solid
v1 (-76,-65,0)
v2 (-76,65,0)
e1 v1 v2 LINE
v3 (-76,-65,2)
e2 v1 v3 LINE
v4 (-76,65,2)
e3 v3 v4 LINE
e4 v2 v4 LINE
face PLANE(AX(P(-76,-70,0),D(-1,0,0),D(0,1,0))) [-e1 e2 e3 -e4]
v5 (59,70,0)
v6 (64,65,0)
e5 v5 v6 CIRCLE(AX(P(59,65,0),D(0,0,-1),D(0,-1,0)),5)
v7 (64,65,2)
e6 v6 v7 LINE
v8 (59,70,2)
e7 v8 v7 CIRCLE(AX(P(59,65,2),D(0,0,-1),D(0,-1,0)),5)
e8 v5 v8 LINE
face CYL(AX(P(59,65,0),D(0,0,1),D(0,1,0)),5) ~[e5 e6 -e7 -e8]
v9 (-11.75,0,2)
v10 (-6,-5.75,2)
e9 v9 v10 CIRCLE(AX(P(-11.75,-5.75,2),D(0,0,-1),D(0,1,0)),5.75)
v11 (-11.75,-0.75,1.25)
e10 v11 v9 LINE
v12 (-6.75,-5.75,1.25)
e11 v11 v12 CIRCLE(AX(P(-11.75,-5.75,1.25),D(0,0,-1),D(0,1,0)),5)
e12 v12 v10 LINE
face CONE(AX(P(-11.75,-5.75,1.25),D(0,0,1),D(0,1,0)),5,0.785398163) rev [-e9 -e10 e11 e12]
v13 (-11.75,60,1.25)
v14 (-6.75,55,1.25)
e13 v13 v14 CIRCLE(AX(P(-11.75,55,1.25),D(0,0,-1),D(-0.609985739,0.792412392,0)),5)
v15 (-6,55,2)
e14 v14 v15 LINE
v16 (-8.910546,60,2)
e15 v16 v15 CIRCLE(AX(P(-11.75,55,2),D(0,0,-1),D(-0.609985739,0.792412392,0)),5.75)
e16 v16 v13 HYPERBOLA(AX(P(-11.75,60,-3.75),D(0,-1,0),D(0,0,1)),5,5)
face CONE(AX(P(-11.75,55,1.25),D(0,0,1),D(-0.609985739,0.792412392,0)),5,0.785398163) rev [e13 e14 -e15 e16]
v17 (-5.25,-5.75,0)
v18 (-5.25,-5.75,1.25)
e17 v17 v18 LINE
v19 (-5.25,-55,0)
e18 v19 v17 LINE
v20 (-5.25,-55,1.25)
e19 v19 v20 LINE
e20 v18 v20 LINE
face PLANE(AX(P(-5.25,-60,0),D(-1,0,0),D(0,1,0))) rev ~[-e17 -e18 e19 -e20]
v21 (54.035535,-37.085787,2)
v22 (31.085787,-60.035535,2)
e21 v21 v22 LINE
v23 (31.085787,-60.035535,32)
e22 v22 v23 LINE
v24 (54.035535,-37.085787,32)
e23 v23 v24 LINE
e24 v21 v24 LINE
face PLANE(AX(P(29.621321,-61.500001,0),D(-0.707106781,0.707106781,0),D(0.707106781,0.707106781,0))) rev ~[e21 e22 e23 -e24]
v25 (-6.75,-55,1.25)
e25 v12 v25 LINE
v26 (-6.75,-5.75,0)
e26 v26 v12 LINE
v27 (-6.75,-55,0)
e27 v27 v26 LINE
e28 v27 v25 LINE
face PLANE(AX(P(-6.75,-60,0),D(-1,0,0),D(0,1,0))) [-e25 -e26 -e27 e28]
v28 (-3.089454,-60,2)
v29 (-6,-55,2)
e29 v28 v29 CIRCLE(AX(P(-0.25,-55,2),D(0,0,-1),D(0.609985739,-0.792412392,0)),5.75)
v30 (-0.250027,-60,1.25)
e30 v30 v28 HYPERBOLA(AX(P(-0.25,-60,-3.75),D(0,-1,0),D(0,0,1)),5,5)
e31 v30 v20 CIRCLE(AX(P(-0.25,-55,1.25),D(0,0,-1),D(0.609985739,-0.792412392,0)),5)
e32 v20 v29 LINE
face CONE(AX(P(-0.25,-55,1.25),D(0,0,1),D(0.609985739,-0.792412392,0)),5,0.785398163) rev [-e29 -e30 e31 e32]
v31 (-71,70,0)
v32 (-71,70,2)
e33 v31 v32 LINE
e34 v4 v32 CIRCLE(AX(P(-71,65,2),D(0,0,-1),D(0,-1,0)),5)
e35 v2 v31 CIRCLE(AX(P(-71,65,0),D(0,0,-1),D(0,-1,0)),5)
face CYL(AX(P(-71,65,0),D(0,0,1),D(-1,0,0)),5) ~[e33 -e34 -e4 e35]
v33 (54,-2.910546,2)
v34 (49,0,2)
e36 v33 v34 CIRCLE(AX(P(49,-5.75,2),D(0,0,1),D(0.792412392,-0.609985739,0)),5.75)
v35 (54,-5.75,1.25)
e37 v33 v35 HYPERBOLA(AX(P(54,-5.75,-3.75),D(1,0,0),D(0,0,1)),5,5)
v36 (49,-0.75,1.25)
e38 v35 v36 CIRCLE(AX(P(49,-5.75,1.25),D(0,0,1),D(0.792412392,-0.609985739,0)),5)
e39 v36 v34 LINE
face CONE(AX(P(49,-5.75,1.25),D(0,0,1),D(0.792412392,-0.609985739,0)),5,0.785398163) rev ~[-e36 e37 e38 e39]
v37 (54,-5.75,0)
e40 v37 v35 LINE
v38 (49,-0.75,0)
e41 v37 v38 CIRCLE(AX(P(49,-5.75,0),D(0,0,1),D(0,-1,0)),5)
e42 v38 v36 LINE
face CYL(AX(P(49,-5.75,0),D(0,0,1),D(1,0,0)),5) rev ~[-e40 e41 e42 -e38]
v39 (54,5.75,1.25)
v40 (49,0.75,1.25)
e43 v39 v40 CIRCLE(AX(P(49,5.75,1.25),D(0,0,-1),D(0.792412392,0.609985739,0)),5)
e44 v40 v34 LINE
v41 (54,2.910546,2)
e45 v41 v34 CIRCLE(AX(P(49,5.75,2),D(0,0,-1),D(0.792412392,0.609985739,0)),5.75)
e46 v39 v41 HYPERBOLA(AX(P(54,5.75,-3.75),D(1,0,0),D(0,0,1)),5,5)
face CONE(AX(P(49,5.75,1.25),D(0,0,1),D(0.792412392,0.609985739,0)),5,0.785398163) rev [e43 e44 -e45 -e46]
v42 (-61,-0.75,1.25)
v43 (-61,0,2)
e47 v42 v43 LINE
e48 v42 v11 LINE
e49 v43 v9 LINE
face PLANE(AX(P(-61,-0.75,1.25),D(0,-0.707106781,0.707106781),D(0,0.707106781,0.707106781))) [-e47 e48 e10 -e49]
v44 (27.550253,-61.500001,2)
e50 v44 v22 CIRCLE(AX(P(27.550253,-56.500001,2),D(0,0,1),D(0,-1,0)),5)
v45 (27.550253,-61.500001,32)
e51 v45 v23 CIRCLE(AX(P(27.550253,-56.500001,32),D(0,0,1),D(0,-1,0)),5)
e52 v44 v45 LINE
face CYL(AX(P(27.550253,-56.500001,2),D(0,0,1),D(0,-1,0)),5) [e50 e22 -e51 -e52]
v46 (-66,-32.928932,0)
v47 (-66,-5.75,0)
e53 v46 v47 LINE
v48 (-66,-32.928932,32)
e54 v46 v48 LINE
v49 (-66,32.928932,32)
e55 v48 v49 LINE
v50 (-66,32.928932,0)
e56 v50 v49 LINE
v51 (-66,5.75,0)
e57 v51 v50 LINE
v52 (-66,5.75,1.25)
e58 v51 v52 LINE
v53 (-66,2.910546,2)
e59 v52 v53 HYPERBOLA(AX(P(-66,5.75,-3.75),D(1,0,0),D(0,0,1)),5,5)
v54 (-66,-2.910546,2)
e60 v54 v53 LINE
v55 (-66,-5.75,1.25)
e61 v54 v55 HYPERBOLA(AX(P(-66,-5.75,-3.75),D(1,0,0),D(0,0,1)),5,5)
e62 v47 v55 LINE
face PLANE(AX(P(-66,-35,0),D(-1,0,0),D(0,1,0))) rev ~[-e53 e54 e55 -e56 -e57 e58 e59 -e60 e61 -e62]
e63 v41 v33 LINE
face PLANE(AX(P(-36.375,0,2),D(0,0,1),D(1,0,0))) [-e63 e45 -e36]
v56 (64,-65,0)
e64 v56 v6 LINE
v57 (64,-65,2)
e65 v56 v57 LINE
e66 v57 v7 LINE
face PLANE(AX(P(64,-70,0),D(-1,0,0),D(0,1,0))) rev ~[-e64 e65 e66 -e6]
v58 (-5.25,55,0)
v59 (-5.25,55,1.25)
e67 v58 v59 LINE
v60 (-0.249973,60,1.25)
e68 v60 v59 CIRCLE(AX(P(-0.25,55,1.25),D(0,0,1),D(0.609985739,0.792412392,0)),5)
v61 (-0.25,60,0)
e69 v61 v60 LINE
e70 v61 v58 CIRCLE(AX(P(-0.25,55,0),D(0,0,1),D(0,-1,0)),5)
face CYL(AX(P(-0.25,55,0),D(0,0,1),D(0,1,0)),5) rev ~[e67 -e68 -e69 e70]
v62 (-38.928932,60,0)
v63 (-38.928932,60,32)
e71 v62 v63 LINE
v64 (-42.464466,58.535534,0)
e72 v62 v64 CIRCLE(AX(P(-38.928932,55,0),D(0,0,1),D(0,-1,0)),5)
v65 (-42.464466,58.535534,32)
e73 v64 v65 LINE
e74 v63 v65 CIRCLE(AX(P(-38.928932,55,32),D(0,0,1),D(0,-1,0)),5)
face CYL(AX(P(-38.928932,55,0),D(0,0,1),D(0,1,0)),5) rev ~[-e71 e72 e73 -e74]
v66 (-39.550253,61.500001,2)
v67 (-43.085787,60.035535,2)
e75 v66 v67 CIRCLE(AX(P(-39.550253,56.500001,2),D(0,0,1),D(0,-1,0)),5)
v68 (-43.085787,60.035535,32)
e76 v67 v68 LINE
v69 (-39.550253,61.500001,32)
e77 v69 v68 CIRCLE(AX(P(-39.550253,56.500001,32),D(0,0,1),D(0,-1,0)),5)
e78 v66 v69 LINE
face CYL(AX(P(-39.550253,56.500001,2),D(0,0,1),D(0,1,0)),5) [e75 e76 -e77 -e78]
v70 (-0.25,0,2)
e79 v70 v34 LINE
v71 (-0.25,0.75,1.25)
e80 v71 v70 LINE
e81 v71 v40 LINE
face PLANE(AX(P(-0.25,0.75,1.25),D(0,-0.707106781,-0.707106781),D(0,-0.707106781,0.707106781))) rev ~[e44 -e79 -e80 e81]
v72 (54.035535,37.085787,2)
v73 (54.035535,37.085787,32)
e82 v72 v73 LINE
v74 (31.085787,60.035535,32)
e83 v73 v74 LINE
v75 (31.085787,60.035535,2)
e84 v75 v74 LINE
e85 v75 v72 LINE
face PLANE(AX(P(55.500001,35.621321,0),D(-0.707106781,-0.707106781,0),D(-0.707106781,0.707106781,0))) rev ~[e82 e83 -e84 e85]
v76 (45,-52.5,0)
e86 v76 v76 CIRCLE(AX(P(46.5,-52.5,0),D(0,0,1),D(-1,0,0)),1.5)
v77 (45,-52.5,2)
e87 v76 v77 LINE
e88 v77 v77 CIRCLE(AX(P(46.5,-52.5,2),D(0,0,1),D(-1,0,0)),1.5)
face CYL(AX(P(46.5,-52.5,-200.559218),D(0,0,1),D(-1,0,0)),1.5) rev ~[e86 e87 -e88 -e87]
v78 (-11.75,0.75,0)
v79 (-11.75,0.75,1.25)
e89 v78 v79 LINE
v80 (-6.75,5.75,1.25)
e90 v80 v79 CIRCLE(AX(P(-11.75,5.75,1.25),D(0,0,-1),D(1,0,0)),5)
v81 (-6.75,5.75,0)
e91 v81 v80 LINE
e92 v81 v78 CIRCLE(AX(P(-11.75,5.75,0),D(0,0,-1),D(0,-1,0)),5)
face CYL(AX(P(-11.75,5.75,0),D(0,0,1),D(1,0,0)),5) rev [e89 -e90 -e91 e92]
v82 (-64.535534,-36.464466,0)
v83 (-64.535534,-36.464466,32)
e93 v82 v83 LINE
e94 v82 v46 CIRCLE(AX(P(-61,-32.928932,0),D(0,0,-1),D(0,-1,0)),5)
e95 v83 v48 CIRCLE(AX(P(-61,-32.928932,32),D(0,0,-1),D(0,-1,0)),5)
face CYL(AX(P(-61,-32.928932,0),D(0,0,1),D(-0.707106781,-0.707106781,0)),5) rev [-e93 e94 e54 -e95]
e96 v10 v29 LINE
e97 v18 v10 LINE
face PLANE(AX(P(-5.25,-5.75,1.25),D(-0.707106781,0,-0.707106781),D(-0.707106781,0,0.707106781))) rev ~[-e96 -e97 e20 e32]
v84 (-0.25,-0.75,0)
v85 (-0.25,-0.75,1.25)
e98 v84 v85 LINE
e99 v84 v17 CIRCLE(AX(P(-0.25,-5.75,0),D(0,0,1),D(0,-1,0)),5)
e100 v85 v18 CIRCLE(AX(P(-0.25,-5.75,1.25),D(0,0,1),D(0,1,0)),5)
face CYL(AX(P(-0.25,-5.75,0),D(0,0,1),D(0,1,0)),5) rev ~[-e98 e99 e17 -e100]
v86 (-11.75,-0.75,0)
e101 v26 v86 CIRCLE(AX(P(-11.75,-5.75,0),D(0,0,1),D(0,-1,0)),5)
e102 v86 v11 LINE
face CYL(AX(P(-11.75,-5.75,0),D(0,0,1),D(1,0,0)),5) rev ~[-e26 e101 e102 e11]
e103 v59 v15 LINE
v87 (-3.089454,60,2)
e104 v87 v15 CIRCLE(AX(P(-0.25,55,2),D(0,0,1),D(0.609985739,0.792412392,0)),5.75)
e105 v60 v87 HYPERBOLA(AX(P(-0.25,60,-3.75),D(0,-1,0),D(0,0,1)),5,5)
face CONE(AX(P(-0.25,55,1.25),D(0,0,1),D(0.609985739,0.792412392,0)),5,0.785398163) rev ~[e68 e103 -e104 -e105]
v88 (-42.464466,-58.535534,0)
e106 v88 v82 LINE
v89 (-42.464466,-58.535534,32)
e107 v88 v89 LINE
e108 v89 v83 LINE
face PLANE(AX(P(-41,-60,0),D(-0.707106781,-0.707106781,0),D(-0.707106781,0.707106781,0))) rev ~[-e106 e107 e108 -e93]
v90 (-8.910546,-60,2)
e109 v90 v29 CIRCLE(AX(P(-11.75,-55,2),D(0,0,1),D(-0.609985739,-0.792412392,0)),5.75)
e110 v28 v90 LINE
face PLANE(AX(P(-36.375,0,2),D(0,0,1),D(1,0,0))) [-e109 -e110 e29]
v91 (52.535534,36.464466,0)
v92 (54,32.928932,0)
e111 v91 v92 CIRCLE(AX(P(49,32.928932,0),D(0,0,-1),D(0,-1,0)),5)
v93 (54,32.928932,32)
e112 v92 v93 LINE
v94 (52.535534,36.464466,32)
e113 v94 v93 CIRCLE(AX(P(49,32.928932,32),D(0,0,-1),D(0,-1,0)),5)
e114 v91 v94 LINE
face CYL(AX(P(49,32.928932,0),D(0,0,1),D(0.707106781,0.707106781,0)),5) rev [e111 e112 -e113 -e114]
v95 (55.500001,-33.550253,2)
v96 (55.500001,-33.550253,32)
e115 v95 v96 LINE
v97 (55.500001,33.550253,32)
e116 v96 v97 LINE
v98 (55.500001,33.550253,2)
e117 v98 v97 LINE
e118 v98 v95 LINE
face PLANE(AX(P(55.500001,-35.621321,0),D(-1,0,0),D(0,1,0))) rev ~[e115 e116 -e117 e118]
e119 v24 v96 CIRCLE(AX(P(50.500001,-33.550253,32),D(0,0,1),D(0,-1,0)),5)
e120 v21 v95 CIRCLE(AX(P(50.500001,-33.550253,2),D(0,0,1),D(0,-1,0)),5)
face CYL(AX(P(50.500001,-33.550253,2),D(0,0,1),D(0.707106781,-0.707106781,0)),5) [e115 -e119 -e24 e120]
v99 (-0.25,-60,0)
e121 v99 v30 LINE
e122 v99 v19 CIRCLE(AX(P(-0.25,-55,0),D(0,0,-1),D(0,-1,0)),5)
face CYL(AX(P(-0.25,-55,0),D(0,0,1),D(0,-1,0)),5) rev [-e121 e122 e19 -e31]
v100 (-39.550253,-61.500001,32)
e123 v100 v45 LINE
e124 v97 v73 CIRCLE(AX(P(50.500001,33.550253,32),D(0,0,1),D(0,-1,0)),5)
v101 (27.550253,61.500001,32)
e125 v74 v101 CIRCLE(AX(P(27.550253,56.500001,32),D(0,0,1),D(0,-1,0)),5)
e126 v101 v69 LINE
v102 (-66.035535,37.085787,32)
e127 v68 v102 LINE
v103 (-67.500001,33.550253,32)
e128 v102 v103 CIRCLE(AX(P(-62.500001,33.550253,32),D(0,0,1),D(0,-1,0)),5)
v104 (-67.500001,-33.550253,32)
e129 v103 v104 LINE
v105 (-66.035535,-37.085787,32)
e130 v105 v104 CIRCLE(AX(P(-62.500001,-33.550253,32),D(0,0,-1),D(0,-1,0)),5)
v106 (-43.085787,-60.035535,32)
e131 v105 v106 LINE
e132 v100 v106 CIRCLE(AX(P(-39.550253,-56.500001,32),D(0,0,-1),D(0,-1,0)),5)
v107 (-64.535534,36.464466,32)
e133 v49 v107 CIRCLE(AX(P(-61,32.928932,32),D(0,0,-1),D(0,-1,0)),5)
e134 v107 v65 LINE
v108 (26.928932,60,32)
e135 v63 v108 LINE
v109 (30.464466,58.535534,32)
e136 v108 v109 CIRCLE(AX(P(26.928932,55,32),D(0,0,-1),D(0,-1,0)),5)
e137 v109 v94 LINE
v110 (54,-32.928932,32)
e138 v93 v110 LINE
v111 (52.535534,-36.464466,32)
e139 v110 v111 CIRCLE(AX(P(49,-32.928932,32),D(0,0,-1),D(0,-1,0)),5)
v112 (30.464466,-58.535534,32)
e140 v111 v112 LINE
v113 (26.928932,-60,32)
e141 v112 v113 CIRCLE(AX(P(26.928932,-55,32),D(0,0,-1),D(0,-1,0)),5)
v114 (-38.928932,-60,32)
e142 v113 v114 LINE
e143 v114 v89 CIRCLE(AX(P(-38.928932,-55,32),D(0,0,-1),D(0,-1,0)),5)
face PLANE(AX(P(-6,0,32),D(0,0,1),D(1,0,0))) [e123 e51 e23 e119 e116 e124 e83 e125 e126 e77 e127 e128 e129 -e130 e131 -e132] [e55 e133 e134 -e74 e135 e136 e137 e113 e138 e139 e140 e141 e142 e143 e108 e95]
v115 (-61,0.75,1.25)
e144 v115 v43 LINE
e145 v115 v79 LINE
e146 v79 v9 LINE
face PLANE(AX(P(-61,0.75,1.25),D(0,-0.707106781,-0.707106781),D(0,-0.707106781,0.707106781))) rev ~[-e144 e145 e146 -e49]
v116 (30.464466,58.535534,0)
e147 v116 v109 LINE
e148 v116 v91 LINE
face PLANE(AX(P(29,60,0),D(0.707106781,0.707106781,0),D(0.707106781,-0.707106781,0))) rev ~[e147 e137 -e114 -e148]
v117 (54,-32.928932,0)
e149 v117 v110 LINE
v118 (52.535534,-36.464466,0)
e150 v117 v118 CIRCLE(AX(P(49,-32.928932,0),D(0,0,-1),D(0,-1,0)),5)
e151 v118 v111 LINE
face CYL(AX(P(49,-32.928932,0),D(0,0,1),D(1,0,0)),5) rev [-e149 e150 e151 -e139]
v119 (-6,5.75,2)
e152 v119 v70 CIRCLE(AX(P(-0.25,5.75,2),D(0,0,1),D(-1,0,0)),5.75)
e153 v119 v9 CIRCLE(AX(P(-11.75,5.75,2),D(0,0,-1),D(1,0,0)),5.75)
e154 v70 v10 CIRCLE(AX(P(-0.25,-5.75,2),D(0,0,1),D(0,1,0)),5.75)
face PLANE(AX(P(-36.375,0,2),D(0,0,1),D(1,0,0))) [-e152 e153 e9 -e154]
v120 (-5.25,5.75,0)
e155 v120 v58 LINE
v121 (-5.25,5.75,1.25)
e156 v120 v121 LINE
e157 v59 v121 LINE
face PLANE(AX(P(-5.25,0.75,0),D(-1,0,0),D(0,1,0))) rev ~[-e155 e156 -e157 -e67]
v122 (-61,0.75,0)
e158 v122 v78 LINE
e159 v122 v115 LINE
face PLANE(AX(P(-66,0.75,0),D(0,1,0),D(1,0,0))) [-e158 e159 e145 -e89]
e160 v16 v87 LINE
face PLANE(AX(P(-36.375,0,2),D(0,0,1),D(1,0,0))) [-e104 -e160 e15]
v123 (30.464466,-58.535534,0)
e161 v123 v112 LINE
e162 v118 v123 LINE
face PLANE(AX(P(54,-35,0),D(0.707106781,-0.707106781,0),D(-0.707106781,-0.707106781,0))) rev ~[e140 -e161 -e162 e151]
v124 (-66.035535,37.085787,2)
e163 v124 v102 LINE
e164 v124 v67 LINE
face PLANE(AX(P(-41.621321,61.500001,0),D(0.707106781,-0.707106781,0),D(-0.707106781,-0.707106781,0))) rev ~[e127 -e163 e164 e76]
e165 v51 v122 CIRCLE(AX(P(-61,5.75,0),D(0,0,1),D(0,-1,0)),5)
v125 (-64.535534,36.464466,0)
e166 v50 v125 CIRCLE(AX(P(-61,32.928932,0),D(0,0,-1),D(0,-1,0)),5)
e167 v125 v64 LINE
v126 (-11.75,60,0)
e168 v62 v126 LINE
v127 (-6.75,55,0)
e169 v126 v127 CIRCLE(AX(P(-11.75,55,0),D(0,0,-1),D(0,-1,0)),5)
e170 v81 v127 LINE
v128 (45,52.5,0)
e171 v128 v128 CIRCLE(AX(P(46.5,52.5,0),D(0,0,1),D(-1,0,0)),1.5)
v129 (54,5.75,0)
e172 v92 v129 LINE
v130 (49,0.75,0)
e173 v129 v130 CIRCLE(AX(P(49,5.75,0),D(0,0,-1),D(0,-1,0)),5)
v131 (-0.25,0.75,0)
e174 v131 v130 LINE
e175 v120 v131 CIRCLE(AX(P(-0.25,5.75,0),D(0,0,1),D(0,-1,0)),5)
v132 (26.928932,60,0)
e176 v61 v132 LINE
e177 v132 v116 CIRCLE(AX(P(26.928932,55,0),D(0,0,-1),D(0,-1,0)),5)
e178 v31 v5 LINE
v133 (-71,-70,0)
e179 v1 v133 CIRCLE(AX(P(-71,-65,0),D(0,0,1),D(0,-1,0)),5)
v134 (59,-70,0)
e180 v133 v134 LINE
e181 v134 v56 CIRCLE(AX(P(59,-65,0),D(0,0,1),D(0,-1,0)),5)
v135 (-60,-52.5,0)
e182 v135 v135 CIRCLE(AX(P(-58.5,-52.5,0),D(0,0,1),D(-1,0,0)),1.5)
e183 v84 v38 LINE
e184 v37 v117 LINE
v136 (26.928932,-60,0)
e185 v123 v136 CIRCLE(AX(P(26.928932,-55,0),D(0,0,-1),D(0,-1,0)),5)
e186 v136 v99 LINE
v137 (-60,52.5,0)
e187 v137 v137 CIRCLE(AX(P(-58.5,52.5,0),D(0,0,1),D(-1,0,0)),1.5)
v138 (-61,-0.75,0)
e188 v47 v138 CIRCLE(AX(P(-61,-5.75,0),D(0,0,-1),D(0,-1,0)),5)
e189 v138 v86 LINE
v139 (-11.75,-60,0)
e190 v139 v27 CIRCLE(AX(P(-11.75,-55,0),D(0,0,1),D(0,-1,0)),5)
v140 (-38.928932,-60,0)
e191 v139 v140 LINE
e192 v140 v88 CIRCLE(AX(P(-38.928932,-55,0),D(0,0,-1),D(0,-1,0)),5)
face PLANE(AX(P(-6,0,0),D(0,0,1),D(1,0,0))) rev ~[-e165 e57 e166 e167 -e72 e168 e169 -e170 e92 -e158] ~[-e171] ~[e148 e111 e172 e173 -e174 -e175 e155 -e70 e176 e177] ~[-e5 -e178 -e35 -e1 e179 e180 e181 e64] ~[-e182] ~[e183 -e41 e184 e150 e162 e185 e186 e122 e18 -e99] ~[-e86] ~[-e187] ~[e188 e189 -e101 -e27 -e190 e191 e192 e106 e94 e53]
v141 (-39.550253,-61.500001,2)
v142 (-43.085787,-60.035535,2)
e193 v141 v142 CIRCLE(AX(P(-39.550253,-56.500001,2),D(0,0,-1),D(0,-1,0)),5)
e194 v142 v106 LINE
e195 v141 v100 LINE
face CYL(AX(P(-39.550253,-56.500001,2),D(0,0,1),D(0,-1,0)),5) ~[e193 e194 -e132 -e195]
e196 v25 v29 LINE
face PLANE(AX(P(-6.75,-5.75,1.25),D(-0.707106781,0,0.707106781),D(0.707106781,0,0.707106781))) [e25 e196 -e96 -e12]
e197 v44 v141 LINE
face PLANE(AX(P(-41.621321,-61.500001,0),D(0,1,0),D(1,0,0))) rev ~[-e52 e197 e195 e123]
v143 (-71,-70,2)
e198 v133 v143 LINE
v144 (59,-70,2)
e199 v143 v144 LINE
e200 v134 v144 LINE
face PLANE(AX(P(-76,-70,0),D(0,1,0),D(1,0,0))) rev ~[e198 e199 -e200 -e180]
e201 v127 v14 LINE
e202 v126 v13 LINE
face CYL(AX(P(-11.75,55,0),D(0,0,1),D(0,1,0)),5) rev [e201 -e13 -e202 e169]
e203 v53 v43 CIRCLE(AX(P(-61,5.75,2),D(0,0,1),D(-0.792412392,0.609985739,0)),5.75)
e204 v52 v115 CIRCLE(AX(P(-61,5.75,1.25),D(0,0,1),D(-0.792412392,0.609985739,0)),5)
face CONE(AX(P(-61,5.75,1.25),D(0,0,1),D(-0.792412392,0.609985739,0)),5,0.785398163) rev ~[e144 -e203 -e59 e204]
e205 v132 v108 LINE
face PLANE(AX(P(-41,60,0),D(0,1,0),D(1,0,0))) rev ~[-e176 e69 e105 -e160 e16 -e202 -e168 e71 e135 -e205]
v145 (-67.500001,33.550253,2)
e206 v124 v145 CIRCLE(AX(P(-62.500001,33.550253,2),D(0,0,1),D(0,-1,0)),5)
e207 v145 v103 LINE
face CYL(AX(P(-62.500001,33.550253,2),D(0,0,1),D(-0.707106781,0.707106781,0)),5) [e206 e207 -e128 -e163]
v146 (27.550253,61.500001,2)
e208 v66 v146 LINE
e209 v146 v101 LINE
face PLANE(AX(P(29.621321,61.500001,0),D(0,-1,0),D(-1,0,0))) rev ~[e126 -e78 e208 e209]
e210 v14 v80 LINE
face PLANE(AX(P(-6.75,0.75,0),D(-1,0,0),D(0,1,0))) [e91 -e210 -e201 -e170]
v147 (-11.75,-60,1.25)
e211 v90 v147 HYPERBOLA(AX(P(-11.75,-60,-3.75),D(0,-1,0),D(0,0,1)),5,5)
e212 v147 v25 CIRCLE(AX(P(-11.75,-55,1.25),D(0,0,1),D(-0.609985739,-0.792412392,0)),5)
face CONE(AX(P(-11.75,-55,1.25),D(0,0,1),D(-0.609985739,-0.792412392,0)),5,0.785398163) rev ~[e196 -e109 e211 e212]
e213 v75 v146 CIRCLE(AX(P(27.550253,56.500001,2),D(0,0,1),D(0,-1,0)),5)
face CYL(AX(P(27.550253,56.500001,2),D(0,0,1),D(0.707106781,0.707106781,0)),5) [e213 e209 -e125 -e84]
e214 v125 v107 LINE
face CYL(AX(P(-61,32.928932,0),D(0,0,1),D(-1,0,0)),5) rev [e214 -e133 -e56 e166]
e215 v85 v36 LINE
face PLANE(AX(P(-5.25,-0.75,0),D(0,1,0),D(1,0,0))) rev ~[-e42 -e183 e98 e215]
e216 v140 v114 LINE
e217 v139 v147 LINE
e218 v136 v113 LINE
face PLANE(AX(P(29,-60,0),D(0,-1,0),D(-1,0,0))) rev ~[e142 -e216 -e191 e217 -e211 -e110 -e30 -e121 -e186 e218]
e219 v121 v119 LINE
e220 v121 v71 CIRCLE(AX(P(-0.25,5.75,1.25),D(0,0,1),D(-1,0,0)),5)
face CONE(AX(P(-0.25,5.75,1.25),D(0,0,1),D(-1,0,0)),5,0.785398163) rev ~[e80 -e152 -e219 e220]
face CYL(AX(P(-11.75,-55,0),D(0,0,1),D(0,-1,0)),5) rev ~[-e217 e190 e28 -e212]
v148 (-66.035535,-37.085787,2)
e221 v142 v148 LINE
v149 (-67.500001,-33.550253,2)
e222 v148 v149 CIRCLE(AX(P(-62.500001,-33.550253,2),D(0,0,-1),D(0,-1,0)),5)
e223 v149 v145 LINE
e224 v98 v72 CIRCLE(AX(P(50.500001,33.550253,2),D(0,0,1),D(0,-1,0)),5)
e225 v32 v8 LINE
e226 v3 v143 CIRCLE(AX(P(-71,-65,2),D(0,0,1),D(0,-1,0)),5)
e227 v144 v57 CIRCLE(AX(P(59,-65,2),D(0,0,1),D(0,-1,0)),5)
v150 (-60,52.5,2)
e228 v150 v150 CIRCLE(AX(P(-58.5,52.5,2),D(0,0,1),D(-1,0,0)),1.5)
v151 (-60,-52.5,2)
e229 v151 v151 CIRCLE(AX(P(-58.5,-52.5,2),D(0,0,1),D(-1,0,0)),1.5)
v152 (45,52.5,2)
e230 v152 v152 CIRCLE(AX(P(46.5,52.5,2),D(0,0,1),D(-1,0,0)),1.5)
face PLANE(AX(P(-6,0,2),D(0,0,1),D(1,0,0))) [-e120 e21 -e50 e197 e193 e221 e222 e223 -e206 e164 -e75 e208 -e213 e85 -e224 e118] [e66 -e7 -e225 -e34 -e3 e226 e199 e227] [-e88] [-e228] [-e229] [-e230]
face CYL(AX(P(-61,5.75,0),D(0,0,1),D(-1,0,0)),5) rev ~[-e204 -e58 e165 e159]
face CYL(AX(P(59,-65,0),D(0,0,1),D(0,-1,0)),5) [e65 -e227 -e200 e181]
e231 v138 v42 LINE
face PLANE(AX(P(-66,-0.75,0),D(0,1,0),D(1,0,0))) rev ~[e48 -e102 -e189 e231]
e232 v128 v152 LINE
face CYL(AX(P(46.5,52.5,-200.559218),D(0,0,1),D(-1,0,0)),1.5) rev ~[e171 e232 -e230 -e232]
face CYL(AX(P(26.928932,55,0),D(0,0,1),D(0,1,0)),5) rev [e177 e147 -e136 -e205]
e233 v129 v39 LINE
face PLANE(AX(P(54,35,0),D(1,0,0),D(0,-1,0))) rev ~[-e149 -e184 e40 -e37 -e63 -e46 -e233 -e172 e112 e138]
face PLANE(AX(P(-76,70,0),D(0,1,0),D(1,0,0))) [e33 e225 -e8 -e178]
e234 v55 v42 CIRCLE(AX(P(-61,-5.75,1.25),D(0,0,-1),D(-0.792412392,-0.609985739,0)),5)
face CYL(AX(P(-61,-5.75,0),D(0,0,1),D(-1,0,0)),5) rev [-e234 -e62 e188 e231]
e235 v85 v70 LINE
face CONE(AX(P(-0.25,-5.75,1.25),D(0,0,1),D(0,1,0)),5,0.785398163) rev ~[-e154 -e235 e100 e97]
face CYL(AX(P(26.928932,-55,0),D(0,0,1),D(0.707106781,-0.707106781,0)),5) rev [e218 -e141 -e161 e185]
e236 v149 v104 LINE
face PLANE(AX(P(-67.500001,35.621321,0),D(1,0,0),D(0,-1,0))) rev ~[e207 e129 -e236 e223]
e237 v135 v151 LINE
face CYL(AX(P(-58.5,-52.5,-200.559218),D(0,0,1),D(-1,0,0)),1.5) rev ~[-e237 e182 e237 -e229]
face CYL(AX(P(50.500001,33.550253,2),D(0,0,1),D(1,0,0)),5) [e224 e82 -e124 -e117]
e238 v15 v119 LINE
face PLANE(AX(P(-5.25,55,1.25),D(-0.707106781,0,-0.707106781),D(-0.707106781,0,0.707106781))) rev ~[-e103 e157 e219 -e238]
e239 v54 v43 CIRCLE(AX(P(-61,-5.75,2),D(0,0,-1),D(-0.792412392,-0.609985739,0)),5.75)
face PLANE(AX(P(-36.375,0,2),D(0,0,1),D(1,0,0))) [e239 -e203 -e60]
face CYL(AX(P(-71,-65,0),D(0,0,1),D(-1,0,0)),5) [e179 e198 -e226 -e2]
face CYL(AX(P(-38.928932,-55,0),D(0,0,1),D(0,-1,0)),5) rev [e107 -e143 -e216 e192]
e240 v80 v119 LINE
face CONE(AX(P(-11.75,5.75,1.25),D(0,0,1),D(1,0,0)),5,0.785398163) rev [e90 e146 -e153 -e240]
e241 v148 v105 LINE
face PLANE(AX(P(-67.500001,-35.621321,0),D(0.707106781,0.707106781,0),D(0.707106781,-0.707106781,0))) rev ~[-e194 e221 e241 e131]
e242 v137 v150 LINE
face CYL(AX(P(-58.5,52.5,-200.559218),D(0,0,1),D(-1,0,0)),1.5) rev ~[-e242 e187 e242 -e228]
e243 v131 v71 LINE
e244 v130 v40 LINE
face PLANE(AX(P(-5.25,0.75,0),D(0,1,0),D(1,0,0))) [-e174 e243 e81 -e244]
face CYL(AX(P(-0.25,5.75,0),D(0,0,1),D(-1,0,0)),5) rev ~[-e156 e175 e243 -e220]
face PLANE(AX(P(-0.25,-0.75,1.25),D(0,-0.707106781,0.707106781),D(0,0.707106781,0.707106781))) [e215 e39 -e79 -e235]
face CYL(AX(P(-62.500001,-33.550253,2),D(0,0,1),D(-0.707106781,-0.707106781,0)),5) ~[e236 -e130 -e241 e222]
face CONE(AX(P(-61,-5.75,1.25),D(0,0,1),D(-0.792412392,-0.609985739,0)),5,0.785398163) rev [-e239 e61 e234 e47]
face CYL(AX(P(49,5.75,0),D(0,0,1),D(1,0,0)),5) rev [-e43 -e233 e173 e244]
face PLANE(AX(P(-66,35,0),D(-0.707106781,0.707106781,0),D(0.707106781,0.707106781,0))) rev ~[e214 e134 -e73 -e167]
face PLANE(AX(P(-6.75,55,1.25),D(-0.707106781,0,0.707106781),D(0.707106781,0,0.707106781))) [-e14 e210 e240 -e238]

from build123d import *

# Parameters (mm, degrees)
F0_W         = 59.25
F0_H         = 1.5
F0_W_2       = 1.5
F0_H_2       = 59.25
F1_DEPTH     = 2
F0_W_3       = 140
F0_H_3       = 140
F2_DEPTH     = 32
F3_D         = 3
F4_R         = 5
F5_T1_DEPTH  = 49.25
F5_T3_DEPTH  = 49.25
F5_T5_DEPTH  = 49.25
F5_T7_DEPTH  = 49.25
F5_T12_ANGLE = 127.5884718038
F5_T15_ANGLE = 90
F5_T19_ANGLE = 127.5884718038
F5_T24_ANGLE = 127.5884718038
F5_T27_ANGLE = 90
F5_T31_ANGLE = 127.5884718038
F5_T36_ANGLE = 127.5884718038
F5_T39_ANGLE = 90
F5_T43_ANGLE = 127.5884718038
F5_T48_ANGLE = 127.5884718038
F5_T53_ANGLE = 127.5884718038
F5_T56_ANGLE = 90


# Not quite as in the source:
# - a fillet or chamfer that OpenCascade refuses, or shapes differently, is made with other operations: its cross-section is extruded or revolved along the edge and cut away or added


with BuildPart() as f1:
    # F0 (on Top) → F1 (new body)
    with BuildSketch(Plane.XY):
        with Locations((-36.375, 0)):
            Rectangle(F0_W, F0_H)
        with Locations((-6, 30.375)):
            Rectangle(F0_W_2, F0_H_2)
        with Locations((-6, -30.375)):
            Rectangle(F0_W_2, F0_H_2)
        with Locations((24.375, 0)):
            Rectangle(F0_W, F0_H)
        with Locations((-6, 0)):
            Rectangle(F0_W_2, F0_H)
    extrude(amount=F1_DEPTH)



with BuildPart() as f1b:
    # F0 (on Top) → F1, piece 2 (new body)
    with BuildSketch(Plane.XY):
        with Locations((-6, 0)):
            Rectangle(F0_W_3, F0_H_3)
        Polygon((55.5000009226, -35.6213207257), (29.6213207257, -61.5000009226), (-41.6213207257, -61.5000009226), (-67.5000009226, -35.6213207257), (-67.5000009226, 35.6213207257), (-41.6213207257, 61.5000009226), (29.6213207257, 61.5000009226), (55.5000009226, 35.6213207257), align=None, mode=Mode.SUBTRACT)
    extrude(amount=F1_DEPTH)


with BuildPart() as f1_1:
    add(f1.part)

    add(f1b.part)  # F2 merges F1b
    # F0 (on Top) → F2 (join)
    with BuildSketch(Plane.XY):
        Polygon((-41.6213207257, -61.5000009226), (29.6213207257, -61.5000009226), (55.5000009226, -35.6213207257), (55.5000009226, 35.6213207257), (29.6213207257, 61.5000009226), (-41.6213207257, 61.5000009226), (-67.5000009226, 35.6213207257), (-67.5000009226, -35.6213207257), align=None)
        Polygon((29, 60), (54, 35), (54, 0.75), (54, -0.75), (54, -35), (29, -60), (-5.25, -60), (-6.75, -60), (-41, -60), (-66, -35), (-66, -0.75), (-66, 0.75), (-66, 35), (-41, 60), (-6.75, 60), (-5.25, 60), align=None, mode=Mode.SUBTRACT)
    extrude(amount=F2_DEPTH)

    # F3 (through all)
    with Locations(Plane(origin=(0, 0, 0), x_dir=(1, 0, 0), z_dir=(0, 0, -1))):
        with Locations((-58.5, -52.5), (-58.5, 52.5), (46.5, 52.5), (46.5, -52.5)):
            Hole(F3_D / 2)

    # F4
    f4_edges = [f1_1.edges().sort_by_distance(p)[0] for p in [
        (-6.75, 60, 1),
        (-6.75, 0.75, 1),
        (-41, 60, 16),
        (-66, 35, 16),
        (-66, -0.75, 1),
        (-66, 0.75, 1),
        (-66, -35, 16),
        (-6.75, -0.75, 1),
        (-6.75, -60, 1),
        (29, -60, 16),
        (54, -35, 16),
        (54, -0.75, 1),
        (-5.25, -0.75, 1),
        (-5.25, -60, 1),
        (29, 60, 16),
        (54, 35, 16),
        (54, 0.75, 1),
        (-5.25, 0.75, 1),
        (-5.25, 60, 1),
        (-41, -60, 16),
        (-76, -70, 1),
        (64, -70, 1),
        (64, 70, 1),
        (-76, 70, 1),
        (-67.500001, -35.621321, 17),
        (-41.621321, -61.500001, 17),
        (29.621321, -61.500001, 17),
        (55.500001, -35.621321, 17),
        (55.500001, 35.621321, 17),
        (29.621321, 61.500001, 17),
        (-41.621321, 61.500001, 17),
        (-67.500001, 35.621321, 17),
    ]]
    fillet(f4_edges, radius=F4_R)

    # F5: chamfer of 0.75 on 20 edges, made by hand

    # F5_s2 → F5_t1 (cut)
    with BuildSketch(Plane.YZ.offset(-61)):
        Polygon((-0.75, 1.25), (0, 2), (-0.75, 2), align=None)
        Polygon((0.75, 1.25), (0, 2), (0.75, 2), align=None)
    extrude(amount=F5_T1_DEPTH, mode=Mode.SUBTRACT)

    # F5_s4 → F5_t3 (cut)
    with BuildSketch(Plane.YZ.offset(-0.25)):
        Polygon((-0.75, 1.25), (0, 2), (-0.75, 2), align=None)
        Polygon((0.75, 1.25), (0, 2), (0.75, 2), align=None)
    extrude(amount=F5_T3_DEPTH, mode=Mode.SUBTRACT)

    # F5_s6 → F5_t5 (cut)
    with BuildSketch(Plane.XZ.offset(-55)):
        Polygon((-5.25, 1.25), (-6, 2), (-5.25, 2), align=None)
        Polygon((-6.75, 1.25), (-6, 2), (-6.75, 2), align=None)
    extrude(amount=F5_T5_DEPTH, mode=Mode.SUBTRACT)

    # F5_s8 → F5_t7 (cut)
    with BuildSketch(Plane.XZ.offset(5.75)):
        Polygon((-6.75, 1.25), (-6, 2), (-6.75, 2), align=None)
        Polygon((-5.25, 1.25), (-6, 2), (-5.25, 2), align=None)
    extrude(amount=F5_T7_DEPTH, mode=Mode.SUBTRACT)


with BuildPart() as f5_tool10:
    # F5_s11 → F5_t12 (revolve)
    with BuildSketch(Plane(origin=(-19.9177172188, 25.8744507102, 0), x_dir=(0, 0, 1), z_dir=(0.6099857389, -0.7924123916, 0))):
        Polygon((1.25, 56.8445738842), (2, 57.5945738842), (2, 56.8445738842), align=None)
    revolve(axis=Axis((-61, -5.75, 2), (0, 0, -1)), revolution_arc=F5_T12_ANGLE)

    split(bisect_by=Plane.YZ.offset(-66), keep=Keep.TOP)


with BuildPart() as f1_2:
    add(f1_1.part)

    # F5_t9: cut F5_tool10
    add(f5_tool10.part, mode=Mode.SUBTRACT)

    # F5_s14 → F5_t15 (revolve, cut)
    with BuildSketch(Plane.YZ.offset(-11.75)):
        Polygon((-0.75, 1.25), (0, 2), (-0.75, 2), align=None)
    revolve(axis=Axis((-11.75, -5.75, 2), (0, 0, -1)), revolution_arc=F5_T15_ANGLE, mode=Mode.SUBTRACT)


with BuildPart() as f5_tool17:
    # F5_s18 → F5_t19 (revolve)
    with BuildSketch(Plane(origin=(19.2067847712, -14.7850600594, 0), x_dir=(0, 0, 1), z_dir=(-0.7924123916, 0.6099857389, 0))):
        Polygon((1.25, -55.7500139684), (2, -56.5000139684), (2, -55.7500139684), align=None)
    revolve(axis=Axis((-11.75, -55, 2), (0, 0, 1)), revolution_arc=F5_T19_ANGLE)

    split(bisect_by=Plane.XZ.offset(60), keep=Keep.BOTTOM)


with BuildPart() as f1_3:
    add(f1_2.part)

    # F5_t16: cut F5_tool17
    add(f5_tool17.part, mode=Mode.SUBTRACT)


with BuildPart() as f5_tool22:
    # F5_s23 → F5_t24 (revolve)
    with BuildSketch(Plane(origin=(15.4527259985, 20.0741276118, 0), x_dir=(0, 0, 1), z_dir=(-0.6099857389, -0.7924123916, 0))):
        Polygon((1.25, -47.3356251854), (2, -48.0856251854), (2, -47.3356251854), align=None)
    revolve(axis=Axis((49, -5.75, 2), (0, 0, 1)), revolution_arc=F5_T24_ANGLE)

    split(bisect_by=Plane.YZ.offset(54), keep=Keep.BOTTOM)


with BuildPart() as f1_4:
    add(f1_3.part)

    # F5_t21: cut F5_tool22
    add(f5_tool22.part, mode=Mode.SUBTRACT)

    # F5_s26 → F5_t27 (revolve, cut)
    with BuildSketch(Plane.YZ.offset(-0.25)):
        Polygon((-0.75, 1.25), (0, 2), (-0.75, 2), align=None)
    revolve(axis=Axis((-0.25, -5.75, 2), (0, 0, 1)), revolution_arc=F5_T27_ANGLE, mode=Mode.SUBTRACT)


with BuildPart() as f5_tool29:
    # F5_s30 → F5_t31 (revolve)
    with BuildSketch(Plane(origin=(-26.7417935508, -20.5853831579, 0), x_dir=(0, 0, 1), z_dir=(0.7924123916, 0.6099857389, 0))):
        Polygon((1.25, 48.4301851013), (2, 49.1801851013), (2, 48.4301851013), align=None)
    revolve(axis=Axis((-0.25, -55, 2), (0, 0, -1)), revolution_arc=F5_T31_ANGLE)

    split(bisect_by=Plane.XZ.offset(60), keep=Keep.BOTTOM)


with BuildPart() as f1_5:
    add(f1_4.part)

    # F5_t28: cut F5_tool29
    add(f5_tool29.part, mode=Mode.SUBTRACT)


with BuildPart() as f5_tool34:
    # F5_s35 → F5_t36 (revolve)
    with BuildSketch(Plane(origin=(19.2067847712, 14.7850600594, 0), x_dir=(0, 0, 1), z_dir=(-0.7924123916, -0.6099857389, 0))):
        Polygon((1.25, 55.7500139684), (2, 56.5000139684), (2, 55.7500139684), align=None)
    revolve(axis=Axis((-11.75, 55, 2), (0, 0, -1)), revolution_arc=F5_T36_ANGLE)

    split(bisect_by=Plane.XZ.offset(-60), keep=Keep.TOP)


with BuildPart() as f1_6:
    add(f1_5.part)

    # F5_t33: cut F5_tool34
    add(f5_tool34.part, mode=Mode.SUBTRACT)

    # F5_s38 → F5_t39 (revolve, cut)
    with BuildSketch(Plane.XZ.offset(-5.75)):
        Polygon((-6.75, 1.25), (-6, 2), (-6.75, 2), align=None)
    revolve(axis=Axis((-11.75, 5.75, 2), (0, 0, -1)), revolution_arc=F5_T39_ANGLE, mode=Mode.SUBTRACT)


with BuildPart() as f5_tool41:
    # F5_s42 → F5_t43 (revolve)
    with BuildSketch(Plane(origin=(-19.9177172188, -25.8744507102, 0), x_dir=(0, 0, 1), z_dir=(0.6099857389, 0.7924123916, 0))):
        Polygon((1.25, -56.8445738842), (2, -57.5945738842), (2, -56.8445738842), align=None)
    revolve(axis=Axis((-61, 5.75, 2), (0, 0, 1)), revolution_arc=F5_T43_ANGLE)

    split(bisect_by=Plane.YZ.offset(-66), keep=Keep.TOP)


with BuildPart() as f1_7:
    add(f1_6.part)

    # F5_t40: cut F5_tool41
    add(f5_tool41.part, mode=Mode.SUBTRACT)


with BuildPart() as f5_tool46:
    # F5_s47 → F5_t48 (revolve)
    with BuildSketch(Plane(origin=(-26.7417935508, 20.5853831579, 0), x_dir=(0, 0, 1), z_dir=(0.7924123916, -0.6099857389, 0))):
        Polygon((1.25, -48.4301851013), (2, -49.1801851013), (2, -48.4301851013), align=None)
    revolve(axis=Axis((-0.25, 55, 2), (0, 0, 1)), revolution_arc=F5_T48_ANGLE)

    split(bisect_by=Plane.XZ.offset(-60), keep=Keep.TOP)


with BuildPart() as f1_8:
    add(f1_7.part)

    # F5_t45: cut F5_tool46
    add(f5_tool46.part, mode=Mode.SUBTRACT)


with BuildPart() as f5_tool51:
    # F5_s52 → F5_t53 (revolve)
    with BuildSketch(Plane(origin=(15.4527259985, -20.0741276118, 0), x_dir=(0, 0, 1), z_dir=(-0.6099857389, 0.7924123916, 0))):
        Polygon((1.25, 47.3356251854), (2, 48.0856251854), (2, 47.3356251854), align=None)
    revolve(axis=Axis((49, 5.75, 2), (0, 0, -1)), revolution_arc=F5_T53_ANGLE)

    split(bisect_by=Plane.YZ.offset(54), keep=Keep.BOTTOM)


with BuildPart() as f1_9:
    add(f1_8.part)

    # F5_t50: cut F5_tool51
    add(f5_tool51.part, mode=Mode.SUBTRACT)

    # F5_s55 → F5_t56 (revolve, cut)
    with BuildSketch(Plane.XZ.offset(-5.75)):
        Polygon((-5.25, 1.25), (-6, 2), (-5.25, 2), align=None)
    revolve(axis=Axis((-0.25, 5.75, 2), (0, 0, 1)), revolution_arc=F5_T56_ANGLE, mode=Mode.SUBTRACT)


solid = f1_9.part
